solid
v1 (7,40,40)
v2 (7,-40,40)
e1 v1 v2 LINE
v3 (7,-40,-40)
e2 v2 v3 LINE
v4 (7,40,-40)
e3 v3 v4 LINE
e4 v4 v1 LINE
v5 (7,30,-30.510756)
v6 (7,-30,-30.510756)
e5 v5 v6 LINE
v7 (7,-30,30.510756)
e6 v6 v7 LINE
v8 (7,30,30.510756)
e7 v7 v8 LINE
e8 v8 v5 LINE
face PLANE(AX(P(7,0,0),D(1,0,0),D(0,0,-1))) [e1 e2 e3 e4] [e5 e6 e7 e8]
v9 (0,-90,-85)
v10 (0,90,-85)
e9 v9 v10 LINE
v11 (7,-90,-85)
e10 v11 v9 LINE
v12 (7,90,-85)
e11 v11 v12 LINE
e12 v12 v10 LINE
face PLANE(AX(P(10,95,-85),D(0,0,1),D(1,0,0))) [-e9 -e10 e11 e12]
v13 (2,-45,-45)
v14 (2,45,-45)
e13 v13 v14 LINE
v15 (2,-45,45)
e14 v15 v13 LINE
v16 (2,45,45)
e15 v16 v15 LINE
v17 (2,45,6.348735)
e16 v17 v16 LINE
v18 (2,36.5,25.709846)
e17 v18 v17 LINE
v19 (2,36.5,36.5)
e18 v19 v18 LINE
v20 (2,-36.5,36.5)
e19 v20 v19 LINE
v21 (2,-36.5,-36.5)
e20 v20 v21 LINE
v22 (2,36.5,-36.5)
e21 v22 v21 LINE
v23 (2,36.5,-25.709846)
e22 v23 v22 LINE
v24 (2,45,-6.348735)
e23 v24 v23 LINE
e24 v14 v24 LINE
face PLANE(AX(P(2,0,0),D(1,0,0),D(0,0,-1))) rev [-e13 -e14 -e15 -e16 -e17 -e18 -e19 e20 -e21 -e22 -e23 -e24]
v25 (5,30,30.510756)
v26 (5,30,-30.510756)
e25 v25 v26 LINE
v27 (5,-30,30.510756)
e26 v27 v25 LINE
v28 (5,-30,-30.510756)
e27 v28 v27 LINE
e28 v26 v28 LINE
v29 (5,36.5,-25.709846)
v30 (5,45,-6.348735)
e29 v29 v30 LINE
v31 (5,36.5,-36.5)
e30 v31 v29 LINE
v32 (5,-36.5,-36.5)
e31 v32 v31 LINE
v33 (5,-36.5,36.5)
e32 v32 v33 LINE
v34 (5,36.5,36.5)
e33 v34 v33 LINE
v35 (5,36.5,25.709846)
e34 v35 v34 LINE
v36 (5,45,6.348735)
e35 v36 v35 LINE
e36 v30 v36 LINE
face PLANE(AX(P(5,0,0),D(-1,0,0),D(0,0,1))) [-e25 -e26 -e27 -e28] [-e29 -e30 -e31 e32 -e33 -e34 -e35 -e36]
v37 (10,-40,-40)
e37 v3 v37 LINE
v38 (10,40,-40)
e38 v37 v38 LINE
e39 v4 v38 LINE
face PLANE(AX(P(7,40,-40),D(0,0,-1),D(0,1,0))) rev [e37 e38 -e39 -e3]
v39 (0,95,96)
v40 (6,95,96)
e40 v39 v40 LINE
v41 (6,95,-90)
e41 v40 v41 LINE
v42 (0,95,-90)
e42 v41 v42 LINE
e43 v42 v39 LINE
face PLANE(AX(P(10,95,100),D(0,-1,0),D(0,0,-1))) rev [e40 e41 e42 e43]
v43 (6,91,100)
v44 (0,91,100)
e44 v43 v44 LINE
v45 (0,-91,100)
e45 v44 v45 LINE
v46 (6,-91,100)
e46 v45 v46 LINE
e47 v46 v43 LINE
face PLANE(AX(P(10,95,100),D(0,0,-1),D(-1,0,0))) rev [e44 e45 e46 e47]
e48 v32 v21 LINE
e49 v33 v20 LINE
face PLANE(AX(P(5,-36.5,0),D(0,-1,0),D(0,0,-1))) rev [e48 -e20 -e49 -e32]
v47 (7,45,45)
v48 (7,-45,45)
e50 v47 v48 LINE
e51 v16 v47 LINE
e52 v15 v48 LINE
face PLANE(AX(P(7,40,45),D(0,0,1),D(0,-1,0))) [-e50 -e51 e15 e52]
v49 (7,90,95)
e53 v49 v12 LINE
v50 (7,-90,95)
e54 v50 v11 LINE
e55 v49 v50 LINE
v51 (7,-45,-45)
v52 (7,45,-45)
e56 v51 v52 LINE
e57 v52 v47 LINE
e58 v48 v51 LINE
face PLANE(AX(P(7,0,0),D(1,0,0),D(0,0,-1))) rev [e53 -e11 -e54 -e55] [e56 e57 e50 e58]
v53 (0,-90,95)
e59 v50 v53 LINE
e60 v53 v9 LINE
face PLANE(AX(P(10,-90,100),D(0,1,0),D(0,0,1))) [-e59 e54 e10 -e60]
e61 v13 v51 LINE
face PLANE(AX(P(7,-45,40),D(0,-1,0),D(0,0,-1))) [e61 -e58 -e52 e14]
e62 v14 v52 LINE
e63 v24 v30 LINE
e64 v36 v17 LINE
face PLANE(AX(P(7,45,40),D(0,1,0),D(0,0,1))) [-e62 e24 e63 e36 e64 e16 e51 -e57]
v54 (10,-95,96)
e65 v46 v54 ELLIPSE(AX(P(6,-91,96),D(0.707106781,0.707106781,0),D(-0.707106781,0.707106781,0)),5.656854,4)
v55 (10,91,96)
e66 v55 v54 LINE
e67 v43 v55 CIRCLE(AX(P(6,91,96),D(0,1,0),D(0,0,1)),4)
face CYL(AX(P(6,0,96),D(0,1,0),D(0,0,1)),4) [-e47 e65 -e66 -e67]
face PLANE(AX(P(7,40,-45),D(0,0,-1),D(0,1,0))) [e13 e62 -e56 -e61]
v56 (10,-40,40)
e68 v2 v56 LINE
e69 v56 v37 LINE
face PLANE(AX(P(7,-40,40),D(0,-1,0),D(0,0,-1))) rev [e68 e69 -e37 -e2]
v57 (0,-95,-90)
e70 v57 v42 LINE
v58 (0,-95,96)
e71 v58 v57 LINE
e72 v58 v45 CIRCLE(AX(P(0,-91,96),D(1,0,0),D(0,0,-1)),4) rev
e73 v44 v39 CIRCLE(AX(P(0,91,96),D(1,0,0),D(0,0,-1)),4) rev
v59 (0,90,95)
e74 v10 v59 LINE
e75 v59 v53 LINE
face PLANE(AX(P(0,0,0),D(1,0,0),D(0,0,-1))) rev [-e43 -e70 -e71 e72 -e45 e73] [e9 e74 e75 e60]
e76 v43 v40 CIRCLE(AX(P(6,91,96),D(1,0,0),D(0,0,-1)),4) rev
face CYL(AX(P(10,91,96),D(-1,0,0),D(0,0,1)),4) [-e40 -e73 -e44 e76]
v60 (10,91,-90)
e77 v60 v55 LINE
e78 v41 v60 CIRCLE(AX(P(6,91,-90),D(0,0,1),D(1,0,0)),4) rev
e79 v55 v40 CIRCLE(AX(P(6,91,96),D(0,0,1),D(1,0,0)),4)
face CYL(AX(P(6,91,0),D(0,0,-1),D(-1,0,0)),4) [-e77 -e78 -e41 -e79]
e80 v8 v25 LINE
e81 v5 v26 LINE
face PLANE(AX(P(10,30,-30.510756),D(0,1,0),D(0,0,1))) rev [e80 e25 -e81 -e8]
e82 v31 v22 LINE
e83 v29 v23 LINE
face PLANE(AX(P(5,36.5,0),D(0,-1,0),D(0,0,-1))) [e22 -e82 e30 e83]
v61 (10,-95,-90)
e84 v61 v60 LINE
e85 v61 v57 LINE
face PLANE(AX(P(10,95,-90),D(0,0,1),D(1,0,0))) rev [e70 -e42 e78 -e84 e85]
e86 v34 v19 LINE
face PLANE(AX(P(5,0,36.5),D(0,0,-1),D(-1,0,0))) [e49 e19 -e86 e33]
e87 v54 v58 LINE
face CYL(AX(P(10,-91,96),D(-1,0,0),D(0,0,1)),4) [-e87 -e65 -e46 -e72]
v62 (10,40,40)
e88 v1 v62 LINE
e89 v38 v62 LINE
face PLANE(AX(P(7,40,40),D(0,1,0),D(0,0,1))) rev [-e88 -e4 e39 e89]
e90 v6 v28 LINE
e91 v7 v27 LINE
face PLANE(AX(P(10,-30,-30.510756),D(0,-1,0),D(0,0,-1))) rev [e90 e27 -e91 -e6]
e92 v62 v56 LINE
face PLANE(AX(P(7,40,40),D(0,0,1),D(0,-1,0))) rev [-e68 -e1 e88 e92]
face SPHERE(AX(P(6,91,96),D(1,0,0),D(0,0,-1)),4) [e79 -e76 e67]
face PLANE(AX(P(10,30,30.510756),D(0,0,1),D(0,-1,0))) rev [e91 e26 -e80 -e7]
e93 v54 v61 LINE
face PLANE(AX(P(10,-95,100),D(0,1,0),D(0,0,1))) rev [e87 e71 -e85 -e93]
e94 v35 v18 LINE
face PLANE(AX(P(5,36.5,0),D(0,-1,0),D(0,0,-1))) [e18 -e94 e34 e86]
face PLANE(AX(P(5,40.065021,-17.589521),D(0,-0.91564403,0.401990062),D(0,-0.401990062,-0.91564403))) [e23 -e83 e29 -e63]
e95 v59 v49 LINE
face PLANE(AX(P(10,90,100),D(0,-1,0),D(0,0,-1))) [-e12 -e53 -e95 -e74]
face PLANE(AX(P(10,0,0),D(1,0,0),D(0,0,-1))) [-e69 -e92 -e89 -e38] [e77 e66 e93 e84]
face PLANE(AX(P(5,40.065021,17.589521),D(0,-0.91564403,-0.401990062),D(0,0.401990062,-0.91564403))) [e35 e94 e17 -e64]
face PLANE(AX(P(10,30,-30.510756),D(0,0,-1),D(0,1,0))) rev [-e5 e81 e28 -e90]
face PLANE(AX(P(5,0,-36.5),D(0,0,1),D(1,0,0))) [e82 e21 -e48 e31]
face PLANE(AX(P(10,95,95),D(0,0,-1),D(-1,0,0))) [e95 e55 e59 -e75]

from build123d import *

# Parameters (mm, degrees)
SKETCH1_W           = 190
SKETCH1_H           = 190
BOSS_EXTRUDE1_DEPTH = 10
CUT_EXTRUDE1_DEPTH  = 5
SKETCH3_W           = 61.021512422
SKETCH3_H           = 60
CUT_EXTRUDE2_DEPTH  = 139.021737418
SKETCH4_W           = 80
SKETCH4_H           = 80
CUT_EXTRUDE3_DEPTH  = 3
FILLET1_R           = 4
SHELL1_START        = -90
SHELL1_DEPTH        = 180
SHELL1_2_DEPTH      = 45
SHELL1_START_2      = 45
SHELL1_3_DEPTH      = 45


# Read off the part's stored shape, not the designer's step: Shell1
with BuildPart() as part:
    # Sketch1 → Boss-Extrude1 (new body)
    with BuildSketch(Plane(origin=(0, 0, 0), x_dir=(0, 0, -1), z_dir=(1, 0, 0))):
        with Locations((-5, 0)):
            Rectangle(SKETCH1_W, SKETCH1_H)
    extrude(amount=BOSS_EXTRUDE1_DEPTH)

    # Sketch2 → Cut-Extrude1 (cut)
    with BuildSketch(Plane.ZY):
        Polygon((36.5, -36.5), (36.5, 36.5), (25.709845909, 36.5), (5.209845909, 45.5), (-5.209845909, 45.5), (-25.709845909, 36.5), (-36.5, 36.5), (-36.5, -36.5), align=None)
    extrude(amount=-CUT_EXTRUDE1_DEPTH, mode=Mode.SUBTRACT)

    # Sketch3 → Cut-Extrude2 (cut, through all)
    with BuildSketch(Plane.ZY.offset(-5)):
        Rectangle(SKETCH3_W, SKETCH3_H)
    extrude(amount=-CUT_EXTRUDE2_DEPTH, mode=Mode.SUBTRACT)

    # Sketch4 → Cut-Extrude3 (cut)
    with BuildSketch(Plane(origin=(10, 0, 0), x_dir=(0, 0, -1), z_dir=(1, 0, 0))):
        Rectangle(SKETCH4_W, SKETCH4_H)
    extrude(amount=-CUT_EXTRUDE3_DEPTH, mode=Mode.SUBTRACT)

    # Fillet1
    fillet1_edges = [part.edges().sort_by_distance(p)[0] for p in [
        (10, 95, 5),
        (10, 0, 100),
        (5, 95, 100),
        (5, -95, 100),
    ]]
    fillet(fillet1_edges, radius=FILLET1_R)

    # Shell1 outline → Shell1 (cut)
    with BuildSketch(Plane(origin=(0, 0, 0), x_dir=(1, 0, 0), z_dir=(0, 1, 0)).offset(SHELL1_START)):
        Polygon((7, -45), (2, -45), (2, 45), (7, 45), (7, 85), (0, 85), (0, -95), (7, -95), align=None)
    extrude(amount=SHELL1_DEPTH, mode=Mode.SUBTRACT)

    # Shell1 2 outline → Shell1 2 (cut)
    with BuildSketch(Plane(origin=(0, 0, 0), x_dir=(1, 0, 0), z_dir=(0, 1, 0)).offset(SHELL1_START)):
        Polygon((2, -36.5), (2, -45), (7, -45), (7, 45), (2, 45), (2, 36.5), align=None)
    extrude(amount=SHELL1_2_DEPTH, mode=Mode.SUBTRACT)

    # Shell1 3 outline → Shell1 3 (cut)
    with BuildSketch(Plane(origin=(0, 0, 0), x_dir=(1, 0, 0), z_dir=(0, 1, 0)).offset(SHELL1_START_2)):
        Polygon((2, -36.5), (2, -45), (7, -45), (7, 45), (2, 45), (2, 36.5), align=None)
    extrude(amount=SHELL1_3_DEPTH, mode=Mode.SUBTRACT)


solid = part.part
